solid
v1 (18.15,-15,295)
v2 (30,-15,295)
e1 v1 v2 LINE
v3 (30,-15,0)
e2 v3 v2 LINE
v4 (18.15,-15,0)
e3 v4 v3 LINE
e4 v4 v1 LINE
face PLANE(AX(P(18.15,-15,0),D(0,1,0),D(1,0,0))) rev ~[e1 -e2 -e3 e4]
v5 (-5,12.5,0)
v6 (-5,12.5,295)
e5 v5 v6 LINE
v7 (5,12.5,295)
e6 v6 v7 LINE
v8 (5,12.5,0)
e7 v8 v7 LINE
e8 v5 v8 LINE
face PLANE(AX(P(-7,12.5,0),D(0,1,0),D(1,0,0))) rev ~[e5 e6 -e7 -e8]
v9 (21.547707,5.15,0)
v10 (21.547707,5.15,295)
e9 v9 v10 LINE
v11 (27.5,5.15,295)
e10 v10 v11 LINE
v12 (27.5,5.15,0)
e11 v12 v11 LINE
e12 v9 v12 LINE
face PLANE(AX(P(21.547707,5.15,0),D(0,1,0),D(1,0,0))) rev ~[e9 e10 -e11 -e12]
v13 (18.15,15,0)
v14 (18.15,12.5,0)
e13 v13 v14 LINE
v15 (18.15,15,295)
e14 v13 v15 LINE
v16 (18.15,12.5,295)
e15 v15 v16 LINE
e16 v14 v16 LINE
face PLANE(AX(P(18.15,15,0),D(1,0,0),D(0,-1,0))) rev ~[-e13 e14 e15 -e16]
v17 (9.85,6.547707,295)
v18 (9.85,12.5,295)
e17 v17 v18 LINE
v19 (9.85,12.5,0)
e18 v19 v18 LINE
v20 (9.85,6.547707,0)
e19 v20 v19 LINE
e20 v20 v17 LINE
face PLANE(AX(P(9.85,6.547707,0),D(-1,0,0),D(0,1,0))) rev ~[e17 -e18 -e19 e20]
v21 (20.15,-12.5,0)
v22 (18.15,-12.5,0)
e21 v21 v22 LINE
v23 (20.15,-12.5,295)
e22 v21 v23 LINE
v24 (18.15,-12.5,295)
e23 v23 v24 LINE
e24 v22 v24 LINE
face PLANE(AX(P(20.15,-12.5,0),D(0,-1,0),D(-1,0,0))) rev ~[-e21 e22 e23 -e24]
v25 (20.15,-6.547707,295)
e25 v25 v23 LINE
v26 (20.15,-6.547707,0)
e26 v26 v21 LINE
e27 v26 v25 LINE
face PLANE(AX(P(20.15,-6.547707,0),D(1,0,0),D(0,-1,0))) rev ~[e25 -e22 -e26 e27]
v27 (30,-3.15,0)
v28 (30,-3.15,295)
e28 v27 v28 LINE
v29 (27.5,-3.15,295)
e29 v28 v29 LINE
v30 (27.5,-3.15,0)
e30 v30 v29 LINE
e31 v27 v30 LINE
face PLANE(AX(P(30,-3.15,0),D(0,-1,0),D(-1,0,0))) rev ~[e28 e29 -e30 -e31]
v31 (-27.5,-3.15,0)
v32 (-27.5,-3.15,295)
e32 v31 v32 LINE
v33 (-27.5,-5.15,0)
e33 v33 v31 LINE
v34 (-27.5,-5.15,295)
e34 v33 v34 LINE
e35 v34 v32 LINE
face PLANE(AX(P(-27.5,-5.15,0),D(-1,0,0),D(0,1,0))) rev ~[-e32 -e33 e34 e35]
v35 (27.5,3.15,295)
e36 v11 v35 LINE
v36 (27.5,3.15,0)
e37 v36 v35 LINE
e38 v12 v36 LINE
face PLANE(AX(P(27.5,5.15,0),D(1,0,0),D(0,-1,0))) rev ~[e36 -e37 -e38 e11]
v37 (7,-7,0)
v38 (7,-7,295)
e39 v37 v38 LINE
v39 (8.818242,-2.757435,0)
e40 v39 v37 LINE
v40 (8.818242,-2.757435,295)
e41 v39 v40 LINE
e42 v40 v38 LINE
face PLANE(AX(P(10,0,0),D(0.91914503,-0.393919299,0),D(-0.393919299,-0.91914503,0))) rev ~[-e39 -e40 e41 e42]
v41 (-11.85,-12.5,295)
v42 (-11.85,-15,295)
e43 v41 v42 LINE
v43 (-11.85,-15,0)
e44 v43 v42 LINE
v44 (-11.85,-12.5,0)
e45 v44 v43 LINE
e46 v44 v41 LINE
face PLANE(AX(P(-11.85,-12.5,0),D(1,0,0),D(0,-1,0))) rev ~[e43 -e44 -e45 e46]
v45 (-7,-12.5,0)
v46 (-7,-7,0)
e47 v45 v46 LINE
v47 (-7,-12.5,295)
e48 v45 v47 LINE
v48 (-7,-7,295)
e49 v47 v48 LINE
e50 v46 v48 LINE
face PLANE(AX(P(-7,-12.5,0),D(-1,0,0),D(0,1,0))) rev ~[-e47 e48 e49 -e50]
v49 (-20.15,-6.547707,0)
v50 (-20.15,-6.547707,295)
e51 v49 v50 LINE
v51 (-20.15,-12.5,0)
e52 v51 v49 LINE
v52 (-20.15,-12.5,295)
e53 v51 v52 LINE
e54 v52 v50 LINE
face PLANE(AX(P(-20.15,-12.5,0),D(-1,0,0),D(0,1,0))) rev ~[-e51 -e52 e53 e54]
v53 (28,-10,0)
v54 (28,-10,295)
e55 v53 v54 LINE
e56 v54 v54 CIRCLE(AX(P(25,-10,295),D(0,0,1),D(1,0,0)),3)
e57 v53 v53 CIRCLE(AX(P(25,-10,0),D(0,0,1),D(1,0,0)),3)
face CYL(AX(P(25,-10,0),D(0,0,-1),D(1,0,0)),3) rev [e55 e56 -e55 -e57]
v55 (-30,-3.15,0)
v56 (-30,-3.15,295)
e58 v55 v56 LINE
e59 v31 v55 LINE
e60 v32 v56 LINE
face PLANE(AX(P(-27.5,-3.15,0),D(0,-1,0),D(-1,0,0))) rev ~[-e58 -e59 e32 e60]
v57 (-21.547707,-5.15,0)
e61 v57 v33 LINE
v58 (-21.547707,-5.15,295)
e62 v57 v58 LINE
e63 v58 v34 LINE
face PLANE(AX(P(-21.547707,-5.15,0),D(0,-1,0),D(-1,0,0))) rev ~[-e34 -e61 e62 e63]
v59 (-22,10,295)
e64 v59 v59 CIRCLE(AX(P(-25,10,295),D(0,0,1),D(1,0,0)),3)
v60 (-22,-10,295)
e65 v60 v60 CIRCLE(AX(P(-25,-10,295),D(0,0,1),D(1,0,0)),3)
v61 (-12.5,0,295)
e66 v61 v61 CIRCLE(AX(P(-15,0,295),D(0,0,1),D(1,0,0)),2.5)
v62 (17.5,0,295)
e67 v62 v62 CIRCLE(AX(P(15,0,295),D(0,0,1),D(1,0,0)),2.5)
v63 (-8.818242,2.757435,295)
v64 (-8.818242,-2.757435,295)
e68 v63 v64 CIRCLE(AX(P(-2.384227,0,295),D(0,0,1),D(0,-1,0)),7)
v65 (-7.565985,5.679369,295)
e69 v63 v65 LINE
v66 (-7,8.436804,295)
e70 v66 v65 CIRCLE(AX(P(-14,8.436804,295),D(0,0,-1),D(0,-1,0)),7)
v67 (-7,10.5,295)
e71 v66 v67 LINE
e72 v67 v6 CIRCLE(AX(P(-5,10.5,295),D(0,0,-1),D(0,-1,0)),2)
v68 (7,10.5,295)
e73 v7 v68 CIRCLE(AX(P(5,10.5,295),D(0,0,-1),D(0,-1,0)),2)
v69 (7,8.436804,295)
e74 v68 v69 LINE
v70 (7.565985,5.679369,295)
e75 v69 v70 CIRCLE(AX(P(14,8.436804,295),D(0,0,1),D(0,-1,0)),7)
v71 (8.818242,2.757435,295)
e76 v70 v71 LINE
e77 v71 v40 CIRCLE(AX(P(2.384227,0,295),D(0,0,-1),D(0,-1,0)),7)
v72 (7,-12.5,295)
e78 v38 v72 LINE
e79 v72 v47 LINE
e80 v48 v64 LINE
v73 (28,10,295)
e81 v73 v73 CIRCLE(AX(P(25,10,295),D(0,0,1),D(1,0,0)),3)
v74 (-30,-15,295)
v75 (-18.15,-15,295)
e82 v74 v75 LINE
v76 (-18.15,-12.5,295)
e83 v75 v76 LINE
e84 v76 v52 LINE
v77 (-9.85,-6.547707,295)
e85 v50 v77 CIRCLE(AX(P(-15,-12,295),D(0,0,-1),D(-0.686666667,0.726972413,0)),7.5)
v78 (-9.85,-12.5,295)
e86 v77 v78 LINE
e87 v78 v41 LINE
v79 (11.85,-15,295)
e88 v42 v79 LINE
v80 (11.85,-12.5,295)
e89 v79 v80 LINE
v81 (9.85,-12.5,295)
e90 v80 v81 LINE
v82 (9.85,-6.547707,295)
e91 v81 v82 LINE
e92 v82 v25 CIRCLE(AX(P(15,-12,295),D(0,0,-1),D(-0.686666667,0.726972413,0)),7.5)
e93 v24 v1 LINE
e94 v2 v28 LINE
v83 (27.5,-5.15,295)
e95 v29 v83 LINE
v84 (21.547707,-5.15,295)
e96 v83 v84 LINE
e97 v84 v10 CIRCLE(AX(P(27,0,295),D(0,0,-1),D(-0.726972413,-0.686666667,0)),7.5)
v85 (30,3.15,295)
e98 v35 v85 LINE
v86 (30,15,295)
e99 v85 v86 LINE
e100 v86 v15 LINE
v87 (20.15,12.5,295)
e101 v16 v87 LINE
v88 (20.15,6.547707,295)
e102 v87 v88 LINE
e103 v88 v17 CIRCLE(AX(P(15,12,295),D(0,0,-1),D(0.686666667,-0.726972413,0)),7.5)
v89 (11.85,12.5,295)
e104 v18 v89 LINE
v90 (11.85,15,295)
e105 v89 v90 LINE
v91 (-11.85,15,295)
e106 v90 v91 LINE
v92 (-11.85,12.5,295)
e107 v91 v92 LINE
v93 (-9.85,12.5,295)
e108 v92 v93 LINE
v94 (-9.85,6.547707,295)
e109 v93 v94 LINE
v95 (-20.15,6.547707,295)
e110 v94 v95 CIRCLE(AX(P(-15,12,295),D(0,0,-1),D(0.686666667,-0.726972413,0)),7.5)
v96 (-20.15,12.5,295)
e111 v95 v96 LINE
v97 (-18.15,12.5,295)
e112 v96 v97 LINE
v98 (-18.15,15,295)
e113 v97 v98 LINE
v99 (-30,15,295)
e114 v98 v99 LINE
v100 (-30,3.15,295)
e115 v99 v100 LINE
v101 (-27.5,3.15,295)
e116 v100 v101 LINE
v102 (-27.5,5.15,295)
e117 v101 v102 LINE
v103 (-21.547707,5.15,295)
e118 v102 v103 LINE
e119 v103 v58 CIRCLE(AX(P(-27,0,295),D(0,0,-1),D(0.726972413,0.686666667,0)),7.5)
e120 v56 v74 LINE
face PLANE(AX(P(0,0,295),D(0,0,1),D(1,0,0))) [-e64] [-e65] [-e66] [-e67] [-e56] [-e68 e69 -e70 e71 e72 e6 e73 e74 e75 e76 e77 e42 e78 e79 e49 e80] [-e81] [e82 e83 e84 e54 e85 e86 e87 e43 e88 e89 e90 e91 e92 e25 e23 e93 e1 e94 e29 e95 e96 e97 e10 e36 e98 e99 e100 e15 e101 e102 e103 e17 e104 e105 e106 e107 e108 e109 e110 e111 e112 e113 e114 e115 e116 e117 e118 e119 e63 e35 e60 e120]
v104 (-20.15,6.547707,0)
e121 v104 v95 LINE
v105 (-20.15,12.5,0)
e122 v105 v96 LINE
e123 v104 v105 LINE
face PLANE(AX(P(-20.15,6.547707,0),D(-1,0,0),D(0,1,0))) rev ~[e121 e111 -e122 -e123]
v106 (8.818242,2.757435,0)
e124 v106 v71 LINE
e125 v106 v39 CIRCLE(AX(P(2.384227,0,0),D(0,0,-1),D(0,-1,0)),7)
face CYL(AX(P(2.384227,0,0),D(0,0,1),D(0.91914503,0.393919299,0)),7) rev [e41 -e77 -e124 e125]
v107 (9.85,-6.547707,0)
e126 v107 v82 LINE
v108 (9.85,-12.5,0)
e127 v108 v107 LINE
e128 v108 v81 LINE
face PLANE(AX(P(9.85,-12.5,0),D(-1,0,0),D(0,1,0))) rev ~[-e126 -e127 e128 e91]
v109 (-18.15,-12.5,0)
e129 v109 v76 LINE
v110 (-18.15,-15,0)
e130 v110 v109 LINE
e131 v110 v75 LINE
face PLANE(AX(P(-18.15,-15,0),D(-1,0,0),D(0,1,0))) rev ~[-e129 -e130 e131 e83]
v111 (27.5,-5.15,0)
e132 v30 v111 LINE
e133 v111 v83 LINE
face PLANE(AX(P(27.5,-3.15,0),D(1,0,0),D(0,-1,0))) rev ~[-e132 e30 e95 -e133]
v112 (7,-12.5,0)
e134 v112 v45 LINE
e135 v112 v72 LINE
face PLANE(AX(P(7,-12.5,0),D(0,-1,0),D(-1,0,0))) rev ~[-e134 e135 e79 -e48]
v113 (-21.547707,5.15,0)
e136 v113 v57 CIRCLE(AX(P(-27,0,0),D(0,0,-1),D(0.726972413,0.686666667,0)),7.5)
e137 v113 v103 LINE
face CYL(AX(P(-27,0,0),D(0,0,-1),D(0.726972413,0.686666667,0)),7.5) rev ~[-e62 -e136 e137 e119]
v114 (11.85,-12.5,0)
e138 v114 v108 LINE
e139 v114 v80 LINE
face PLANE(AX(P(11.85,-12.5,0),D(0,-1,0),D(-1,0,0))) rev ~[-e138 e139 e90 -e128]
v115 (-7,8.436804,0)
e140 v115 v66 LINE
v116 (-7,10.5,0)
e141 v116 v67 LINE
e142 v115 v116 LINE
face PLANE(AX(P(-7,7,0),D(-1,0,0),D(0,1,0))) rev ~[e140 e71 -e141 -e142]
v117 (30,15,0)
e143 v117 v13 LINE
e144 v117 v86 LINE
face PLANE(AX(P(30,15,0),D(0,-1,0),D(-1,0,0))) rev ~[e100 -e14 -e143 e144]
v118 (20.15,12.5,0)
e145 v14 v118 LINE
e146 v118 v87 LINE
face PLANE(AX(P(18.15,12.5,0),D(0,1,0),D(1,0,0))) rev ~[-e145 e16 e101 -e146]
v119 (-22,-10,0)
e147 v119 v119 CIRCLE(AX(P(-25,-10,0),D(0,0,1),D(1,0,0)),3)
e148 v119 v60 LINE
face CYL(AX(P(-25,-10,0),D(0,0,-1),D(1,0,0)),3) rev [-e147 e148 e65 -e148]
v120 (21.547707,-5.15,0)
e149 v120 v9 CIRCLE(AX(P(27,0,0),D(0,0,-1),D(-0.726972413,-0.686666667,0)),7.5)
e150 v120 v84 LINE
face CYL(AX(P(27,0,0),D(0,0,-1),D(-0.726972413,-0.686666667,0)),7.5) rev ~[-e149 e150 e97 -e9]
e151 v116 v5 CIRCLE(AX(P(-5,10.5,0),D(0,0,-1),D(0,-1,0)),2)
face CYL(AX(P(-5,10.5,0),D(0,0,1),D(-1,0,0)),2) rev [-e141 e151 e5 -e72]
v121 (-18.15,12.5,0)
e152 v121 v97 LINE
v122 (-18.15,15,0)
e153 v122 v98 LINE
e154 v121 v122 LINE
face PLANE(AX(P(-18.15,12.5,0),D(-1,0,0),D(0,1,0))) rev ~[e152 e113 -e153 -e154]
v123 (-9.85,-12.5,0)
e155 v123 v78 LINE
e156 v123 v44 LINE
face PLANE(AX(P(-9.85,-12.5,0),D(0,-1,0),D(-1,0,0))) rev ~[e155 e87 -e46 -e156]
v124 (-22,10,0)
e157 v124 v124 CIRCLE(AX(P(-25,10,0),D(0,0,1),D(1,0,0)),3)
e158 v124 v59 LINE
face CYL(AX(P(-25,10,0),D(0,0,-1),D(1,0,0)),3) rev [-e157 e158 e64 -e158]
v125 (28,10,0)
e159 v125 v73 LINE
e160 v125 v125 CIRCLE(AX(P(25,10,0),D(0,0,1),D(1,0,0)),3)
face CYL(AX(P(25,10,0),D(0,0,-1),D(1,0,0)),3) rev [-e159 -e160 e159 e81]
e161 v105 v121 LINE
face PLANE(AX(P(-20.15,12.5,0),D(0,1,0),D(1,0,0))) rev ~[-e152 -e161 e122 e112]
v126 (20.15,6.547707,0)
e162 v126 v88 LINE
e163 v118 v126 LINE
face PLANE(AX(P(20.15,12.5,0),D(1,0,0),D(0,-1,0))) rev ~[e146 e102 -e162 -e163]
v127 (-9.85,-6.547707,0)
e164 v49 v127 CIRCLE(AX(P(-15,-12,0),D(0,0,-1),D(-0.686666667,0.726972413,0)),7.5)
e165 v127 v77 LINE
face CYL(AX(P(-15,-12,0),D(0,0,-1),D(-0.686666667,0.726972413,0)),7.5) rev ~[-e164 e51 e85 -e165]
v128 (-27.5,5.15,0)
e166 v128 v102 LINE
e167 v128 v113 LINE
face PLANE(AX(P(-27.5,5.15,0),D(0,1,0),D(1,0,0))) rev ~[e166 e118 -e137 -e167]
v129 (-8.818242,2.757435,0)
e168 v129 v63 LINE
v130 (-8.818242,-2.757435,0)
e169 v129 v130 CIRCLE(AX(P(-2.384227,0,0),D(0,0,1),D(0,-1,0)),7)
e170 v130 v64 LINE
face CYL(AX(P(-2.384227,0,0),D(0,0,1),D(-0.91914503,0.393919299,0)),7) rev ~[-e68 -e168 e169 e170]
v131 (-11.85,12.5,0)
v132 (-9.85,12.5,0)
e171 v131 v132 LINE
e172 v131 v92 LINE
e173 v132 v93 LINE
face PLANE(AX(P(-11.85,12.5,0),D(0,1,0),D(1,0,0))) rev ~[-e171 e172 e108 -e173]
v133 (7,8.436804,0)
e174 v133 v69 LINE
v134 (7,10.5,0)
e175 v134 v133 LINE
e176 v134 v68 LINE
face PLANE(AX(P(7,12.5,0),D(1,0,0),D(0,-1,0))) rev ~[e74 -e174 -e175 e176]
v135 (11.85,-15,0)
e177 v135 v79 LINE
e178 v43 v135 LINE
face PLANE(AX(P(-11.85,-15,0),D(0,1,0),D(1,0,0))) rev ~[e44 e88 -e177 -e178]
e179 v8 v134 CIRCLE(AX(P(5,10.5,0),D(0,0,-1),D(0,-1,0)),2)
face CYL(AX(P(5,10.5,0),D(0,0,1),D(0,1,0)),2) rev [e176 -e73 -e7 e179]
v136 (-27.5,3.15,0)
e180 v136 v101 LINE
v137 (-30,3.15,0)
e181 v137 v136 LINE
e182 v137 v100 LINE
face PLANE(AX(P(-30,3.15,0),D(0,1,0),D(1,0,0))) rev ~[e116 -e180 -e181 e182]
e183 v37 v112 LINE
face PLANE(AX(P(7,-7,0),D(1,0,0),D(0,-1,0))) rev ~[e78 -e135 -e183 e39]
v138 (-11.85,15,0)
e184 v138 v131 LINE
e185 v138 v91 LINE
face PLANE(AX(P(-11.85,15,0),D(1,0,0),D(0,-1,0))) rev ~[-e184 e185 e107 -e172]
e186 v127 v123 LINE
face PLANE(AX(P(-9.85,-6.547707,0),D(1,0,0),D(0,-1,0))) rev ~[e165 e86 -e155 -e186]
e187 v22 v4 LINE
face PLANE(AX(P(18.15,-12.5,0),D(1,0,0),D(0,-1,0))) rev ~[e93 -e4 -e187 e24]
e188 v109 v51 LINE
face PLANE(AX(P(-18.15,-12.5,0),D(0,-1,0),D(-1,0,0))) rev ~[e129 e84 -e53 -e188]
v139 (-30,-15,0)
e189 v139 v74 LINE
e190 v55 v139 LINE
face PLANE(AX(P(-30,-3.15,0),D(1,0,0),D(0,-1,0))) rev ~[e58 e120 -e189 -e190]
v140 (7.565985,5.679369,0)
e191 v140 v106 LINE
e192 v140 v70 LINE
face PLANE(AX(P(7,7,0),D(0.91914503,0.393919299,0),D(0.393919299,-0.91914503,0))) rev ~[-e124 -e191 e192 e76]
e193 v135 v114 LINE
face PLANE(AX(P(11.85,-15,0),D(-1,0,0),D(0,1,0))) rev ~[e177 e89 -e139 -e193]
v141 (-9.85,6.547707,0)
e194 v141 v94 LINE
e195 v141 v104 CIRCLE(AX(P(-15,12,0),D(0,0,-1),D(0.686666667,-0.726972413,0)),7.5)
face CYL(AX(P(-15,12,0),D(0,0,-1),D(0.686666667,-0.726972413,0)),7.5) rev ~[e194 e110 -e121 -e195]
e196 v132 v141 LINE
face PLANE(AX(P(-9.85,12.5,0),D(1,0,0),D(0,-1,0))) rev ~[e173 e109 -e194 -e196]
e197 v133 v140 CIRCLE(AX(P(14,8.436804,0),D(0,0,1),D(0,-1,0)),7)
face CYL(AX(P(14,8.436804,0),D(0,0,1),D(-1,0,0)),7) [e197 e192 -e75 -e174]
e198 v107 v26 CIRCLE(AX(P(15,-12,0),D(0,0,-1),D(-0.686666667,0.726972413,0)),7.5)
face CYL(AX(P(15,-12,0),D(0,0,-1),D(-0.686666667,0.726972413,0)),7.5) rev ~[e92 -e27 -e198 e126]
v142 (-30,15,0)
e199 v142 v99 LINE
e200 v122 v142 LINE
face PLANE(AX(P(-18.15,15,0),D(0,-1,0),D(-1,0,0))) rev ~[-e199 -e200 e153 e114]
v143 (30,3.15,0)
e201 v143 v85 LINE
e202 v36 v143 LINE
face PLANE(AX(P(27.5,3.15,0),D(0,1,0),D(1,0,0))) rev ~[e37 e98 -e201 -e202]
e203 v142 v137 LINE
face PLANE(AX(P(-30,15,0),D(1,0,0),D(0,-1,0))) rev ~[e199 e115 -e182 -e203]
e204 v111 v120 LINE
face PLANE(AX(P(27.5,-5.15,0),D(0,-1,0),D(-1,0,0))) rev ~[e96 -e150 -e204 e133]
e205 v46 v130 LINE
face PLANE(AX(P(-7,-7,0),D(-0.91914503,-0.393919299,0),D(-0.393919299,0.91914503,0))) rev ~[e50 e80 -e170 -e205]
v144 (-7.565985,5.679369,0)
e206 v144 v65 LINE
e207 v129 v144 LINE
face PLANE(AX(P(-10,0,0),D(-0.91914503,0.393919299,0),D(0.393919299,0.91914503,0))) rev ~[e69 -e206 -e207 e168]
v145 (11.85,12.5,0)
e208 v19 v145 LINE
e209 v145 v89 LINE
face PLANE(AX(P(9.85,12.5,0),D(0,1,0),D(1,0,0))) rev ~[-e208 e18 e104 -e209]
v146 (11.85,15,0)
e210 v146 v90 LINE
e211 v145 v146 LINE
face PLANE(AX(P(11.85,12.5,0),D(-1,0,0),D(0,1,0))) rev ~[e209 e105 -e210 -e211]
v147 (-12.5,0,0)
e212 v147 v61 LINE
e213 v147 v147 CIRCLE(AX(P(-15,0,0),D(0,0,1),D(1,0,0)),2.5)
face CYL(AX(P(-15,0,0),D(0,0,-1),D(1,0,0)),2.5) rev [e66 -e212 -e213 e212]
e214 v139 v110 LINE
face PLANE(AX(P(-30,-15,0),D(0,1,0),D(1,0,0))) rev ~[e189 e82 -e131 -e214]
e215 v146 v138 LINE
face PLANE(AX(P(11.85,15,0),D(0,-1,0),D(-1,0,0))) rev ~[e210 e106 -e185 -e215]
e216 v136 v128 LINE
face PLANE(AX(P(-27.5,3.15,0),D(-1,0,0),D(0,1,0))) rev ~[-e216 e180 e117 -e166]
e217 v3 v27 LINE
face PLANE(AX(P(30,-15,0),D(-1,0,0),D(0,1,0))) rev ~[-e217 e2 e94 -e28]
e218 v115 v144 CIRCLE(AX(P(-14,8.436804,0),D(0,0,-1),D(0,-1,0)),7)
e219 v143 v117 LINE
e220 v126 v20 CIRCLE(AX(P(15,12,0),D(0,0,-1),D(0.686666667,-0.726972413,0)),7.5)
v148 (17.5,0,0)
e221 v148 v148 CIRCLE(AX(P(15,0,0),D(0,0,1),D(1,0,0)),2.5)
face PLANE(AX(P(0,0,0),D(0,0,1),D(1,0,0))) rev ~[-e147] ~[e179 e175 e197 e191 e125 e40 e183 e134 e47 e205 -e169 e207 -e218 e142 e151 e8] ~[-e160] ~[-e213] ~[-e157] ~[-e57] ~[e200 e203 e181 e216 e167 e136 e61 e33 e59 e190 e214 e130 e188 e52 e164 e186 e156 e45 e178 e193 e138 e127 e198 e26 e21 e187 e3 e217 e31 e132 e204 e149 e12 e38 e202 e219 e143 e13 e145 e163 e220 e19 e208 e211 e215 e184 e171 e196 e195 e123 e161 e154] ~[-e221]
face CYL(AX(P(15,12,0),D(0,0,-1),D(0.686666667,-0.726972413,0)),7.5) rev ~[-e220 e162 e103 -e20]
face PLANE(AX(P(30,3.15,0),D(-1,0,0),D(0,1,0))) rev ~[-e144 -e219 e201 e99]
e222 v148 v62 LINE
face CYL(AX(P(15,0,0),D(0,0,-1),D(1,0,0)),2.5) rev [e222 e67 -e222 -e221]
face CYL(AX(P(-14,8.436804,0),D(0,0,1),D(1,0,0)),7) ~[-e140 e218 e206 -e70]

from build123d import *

# Parameters (mm, degrees)
F0_R     = 3
F0_R_2   = 2.5
F1_DEPTH = 295
F2_R     = 2
F3_R     = 7


# Not quite as in the source:
# - a feature names something its author has since deleted; it is built from what else it names


with BuildPart() as f1:
    # F0 (on Top) → F1 (new body)
    with BuildSketch(Plane.XY):
        with BuildLine():
            Line((18.15, -15), (30, -15))
            Line((30, -15), (30, -3.15))
            Line((30, -3.15), (27.5, -3.15))
            Line((27.5, -3.15), (27.5, -5.15))
            Line((27.5, -5.15), (21.5477069044, -5.15))
            ThreePointArc((21.5477069044, -5.15), (19.5, 0), (21.5477069044, 5.15))
            Line((21.5477069044, 5.15), (27.5, 5.15))
            Line((27.5, 5.15), (27.5, 3.15))
            Line((27.5, 3.15), (30, 3.15))
            Line((30, 3.15), (30, 15))
            Line((30, 15), (18.15, 15))
            Line((18.15, 15), (18.15, 12.5))
            Line((18.15, 12.5), (20.15, 12.5))
            Line((20.15, 12.5), (20.15, 6.5477069044))
            ThreePointArc((20.15, 6.5477069044), (15, 4.5), (9.85, 6.5477069044))
            Line((9.85, 6.5477069044), (9.85, 12.5))
            Line((9.85, 12.5), (11.85, 12.5))
            Line((11.85, 12.5), (11.85, 15))
            Line((11.85, 15), (-11.85, 15))
            Line((-11.85, 15), (-11.85, 12.5))
            Line((-11.85, 12.5), (-9.85, 12.5))
            Line((-9.85, 12.5), (-9.85, 6.5477069044))
            ThreePointArc((-9.85, 6.5477069044), (-15, 4.5), (-20.15, 6.5477069044))
            Line((-20.15, 6.5477069044), (-20.15, 12.5))
            Line((-20.15, 12.5), (-18.15, 12.5))
            Line((-18.15, 12.5), (-18.15, 15))
            Line((-18.15, 15), (-30, 15))
            Line((-30, 15), (-30, 3.15))
            Line((-30, 3.15), (-27.5, 3.15))
            Line((-27.5, 3.15), (-27.5, 5.15))
            Line((-27.5, 5.15), (-21.5477069044, 5.15))
            ThreePointArc((-21.5477069044, 5.15), (-19.5, 0), (-21.5477069044, -5.15))
            Line((-21.5477069044, -5.15), (-27.5, -5.15))
            Line((-27.5, -5.15), (-27.5, -3.15))
            Line((-27.5, -3.15), (-30, -3.15))
            Line((-30, -3.15), (-30, -15))
            Line((-30, -15), (-18.15, -15))
            Line((-18.15, -15), (-18.15, -12.5))
            Line((-18.15, -12.5), (-20.15, -12.5))
            Line((-20.15, -12.5), (-20.15, -6.5477069044))
            ThreePointArc((-20.15, -6.5477069044), (-15, -4.5), (-9.85, -6.5477069044))
            Line((-9.85, -6.5477069044), (-9.85, -12.5))
            Line((-9.85, -12.5), (-11.85, -12.5))
            Line((-11.85, -12.5), (-11.85, -15))
            Line((-11.85, -15), (11.85, -15))
            Line((11.85, -15), (11.85, -12.5))
            Line((11.85, -12.5), (9.85, -12.5))
            Line((9.85, -12.5), (9.85, -6.5477069044))
            ThreePointArc((9.85, -6.5477069044), (15, -4.5), (20.15, -6.5477069044))
            Line((20.15, -6.5477069044), (20.15, -12.5))
            Line((20.15, -12.5), (18.15, -12.5))
            Line((18.15, -12.5), (18.15, -15))
        make_face()
        with Locations((-25, -10)):
            Circle(F0_R, mode=Mode.SUBTRACT)
        with Locations((25, -10)):
            Circle(F0_R, mode=Mode.SUBTRACT)
        with Locations((-15, 0)):
            Circle(F0_R_2, mode=Mode.SUBTRACT)
        with Locations((-25, 10)):
            Circle(F0_R, mode=Mode.SUBTRACT)
        Polygon((-7, 7), (-7, 12.5), (0, 12.5), (7, 12.5), (7, 7), (10, 0), (7, -7), (7, -12.5), (0, -12.5), (-7, -12.5), (-7, -7), (-10, 0), align=None, mode=Mode.SUBTRACT)
        with Locations((15, 0)):
            Circle(F0_R_2, mode=Mode.SUBTRACT)
        with Locations((25, 10)):
            Circle(F0_R, mode=Mode.SUBTRACT)
    extrude(amount=F1_DEPTH)

    # F2
    f2_edges = [f1.edges().sort_by_distance(p)[0] for p in [
        (-7, 12.5, 147.5),
        (7, 12.5, 147.5),
    ]]
    fillet(f2_edges, radius=F2_R)

    # F3
    f3_edges = [f1.edges().sort_by_distance(p)[0] for p in [
        (-7, 7, 147.5),
        (-10, 0, 147.5),
        (7, 7, 147.5),
        (10, 0, 147.5),
    ]]
    fillet(f3_edges, radius=F3_R)


solid = f1.part
